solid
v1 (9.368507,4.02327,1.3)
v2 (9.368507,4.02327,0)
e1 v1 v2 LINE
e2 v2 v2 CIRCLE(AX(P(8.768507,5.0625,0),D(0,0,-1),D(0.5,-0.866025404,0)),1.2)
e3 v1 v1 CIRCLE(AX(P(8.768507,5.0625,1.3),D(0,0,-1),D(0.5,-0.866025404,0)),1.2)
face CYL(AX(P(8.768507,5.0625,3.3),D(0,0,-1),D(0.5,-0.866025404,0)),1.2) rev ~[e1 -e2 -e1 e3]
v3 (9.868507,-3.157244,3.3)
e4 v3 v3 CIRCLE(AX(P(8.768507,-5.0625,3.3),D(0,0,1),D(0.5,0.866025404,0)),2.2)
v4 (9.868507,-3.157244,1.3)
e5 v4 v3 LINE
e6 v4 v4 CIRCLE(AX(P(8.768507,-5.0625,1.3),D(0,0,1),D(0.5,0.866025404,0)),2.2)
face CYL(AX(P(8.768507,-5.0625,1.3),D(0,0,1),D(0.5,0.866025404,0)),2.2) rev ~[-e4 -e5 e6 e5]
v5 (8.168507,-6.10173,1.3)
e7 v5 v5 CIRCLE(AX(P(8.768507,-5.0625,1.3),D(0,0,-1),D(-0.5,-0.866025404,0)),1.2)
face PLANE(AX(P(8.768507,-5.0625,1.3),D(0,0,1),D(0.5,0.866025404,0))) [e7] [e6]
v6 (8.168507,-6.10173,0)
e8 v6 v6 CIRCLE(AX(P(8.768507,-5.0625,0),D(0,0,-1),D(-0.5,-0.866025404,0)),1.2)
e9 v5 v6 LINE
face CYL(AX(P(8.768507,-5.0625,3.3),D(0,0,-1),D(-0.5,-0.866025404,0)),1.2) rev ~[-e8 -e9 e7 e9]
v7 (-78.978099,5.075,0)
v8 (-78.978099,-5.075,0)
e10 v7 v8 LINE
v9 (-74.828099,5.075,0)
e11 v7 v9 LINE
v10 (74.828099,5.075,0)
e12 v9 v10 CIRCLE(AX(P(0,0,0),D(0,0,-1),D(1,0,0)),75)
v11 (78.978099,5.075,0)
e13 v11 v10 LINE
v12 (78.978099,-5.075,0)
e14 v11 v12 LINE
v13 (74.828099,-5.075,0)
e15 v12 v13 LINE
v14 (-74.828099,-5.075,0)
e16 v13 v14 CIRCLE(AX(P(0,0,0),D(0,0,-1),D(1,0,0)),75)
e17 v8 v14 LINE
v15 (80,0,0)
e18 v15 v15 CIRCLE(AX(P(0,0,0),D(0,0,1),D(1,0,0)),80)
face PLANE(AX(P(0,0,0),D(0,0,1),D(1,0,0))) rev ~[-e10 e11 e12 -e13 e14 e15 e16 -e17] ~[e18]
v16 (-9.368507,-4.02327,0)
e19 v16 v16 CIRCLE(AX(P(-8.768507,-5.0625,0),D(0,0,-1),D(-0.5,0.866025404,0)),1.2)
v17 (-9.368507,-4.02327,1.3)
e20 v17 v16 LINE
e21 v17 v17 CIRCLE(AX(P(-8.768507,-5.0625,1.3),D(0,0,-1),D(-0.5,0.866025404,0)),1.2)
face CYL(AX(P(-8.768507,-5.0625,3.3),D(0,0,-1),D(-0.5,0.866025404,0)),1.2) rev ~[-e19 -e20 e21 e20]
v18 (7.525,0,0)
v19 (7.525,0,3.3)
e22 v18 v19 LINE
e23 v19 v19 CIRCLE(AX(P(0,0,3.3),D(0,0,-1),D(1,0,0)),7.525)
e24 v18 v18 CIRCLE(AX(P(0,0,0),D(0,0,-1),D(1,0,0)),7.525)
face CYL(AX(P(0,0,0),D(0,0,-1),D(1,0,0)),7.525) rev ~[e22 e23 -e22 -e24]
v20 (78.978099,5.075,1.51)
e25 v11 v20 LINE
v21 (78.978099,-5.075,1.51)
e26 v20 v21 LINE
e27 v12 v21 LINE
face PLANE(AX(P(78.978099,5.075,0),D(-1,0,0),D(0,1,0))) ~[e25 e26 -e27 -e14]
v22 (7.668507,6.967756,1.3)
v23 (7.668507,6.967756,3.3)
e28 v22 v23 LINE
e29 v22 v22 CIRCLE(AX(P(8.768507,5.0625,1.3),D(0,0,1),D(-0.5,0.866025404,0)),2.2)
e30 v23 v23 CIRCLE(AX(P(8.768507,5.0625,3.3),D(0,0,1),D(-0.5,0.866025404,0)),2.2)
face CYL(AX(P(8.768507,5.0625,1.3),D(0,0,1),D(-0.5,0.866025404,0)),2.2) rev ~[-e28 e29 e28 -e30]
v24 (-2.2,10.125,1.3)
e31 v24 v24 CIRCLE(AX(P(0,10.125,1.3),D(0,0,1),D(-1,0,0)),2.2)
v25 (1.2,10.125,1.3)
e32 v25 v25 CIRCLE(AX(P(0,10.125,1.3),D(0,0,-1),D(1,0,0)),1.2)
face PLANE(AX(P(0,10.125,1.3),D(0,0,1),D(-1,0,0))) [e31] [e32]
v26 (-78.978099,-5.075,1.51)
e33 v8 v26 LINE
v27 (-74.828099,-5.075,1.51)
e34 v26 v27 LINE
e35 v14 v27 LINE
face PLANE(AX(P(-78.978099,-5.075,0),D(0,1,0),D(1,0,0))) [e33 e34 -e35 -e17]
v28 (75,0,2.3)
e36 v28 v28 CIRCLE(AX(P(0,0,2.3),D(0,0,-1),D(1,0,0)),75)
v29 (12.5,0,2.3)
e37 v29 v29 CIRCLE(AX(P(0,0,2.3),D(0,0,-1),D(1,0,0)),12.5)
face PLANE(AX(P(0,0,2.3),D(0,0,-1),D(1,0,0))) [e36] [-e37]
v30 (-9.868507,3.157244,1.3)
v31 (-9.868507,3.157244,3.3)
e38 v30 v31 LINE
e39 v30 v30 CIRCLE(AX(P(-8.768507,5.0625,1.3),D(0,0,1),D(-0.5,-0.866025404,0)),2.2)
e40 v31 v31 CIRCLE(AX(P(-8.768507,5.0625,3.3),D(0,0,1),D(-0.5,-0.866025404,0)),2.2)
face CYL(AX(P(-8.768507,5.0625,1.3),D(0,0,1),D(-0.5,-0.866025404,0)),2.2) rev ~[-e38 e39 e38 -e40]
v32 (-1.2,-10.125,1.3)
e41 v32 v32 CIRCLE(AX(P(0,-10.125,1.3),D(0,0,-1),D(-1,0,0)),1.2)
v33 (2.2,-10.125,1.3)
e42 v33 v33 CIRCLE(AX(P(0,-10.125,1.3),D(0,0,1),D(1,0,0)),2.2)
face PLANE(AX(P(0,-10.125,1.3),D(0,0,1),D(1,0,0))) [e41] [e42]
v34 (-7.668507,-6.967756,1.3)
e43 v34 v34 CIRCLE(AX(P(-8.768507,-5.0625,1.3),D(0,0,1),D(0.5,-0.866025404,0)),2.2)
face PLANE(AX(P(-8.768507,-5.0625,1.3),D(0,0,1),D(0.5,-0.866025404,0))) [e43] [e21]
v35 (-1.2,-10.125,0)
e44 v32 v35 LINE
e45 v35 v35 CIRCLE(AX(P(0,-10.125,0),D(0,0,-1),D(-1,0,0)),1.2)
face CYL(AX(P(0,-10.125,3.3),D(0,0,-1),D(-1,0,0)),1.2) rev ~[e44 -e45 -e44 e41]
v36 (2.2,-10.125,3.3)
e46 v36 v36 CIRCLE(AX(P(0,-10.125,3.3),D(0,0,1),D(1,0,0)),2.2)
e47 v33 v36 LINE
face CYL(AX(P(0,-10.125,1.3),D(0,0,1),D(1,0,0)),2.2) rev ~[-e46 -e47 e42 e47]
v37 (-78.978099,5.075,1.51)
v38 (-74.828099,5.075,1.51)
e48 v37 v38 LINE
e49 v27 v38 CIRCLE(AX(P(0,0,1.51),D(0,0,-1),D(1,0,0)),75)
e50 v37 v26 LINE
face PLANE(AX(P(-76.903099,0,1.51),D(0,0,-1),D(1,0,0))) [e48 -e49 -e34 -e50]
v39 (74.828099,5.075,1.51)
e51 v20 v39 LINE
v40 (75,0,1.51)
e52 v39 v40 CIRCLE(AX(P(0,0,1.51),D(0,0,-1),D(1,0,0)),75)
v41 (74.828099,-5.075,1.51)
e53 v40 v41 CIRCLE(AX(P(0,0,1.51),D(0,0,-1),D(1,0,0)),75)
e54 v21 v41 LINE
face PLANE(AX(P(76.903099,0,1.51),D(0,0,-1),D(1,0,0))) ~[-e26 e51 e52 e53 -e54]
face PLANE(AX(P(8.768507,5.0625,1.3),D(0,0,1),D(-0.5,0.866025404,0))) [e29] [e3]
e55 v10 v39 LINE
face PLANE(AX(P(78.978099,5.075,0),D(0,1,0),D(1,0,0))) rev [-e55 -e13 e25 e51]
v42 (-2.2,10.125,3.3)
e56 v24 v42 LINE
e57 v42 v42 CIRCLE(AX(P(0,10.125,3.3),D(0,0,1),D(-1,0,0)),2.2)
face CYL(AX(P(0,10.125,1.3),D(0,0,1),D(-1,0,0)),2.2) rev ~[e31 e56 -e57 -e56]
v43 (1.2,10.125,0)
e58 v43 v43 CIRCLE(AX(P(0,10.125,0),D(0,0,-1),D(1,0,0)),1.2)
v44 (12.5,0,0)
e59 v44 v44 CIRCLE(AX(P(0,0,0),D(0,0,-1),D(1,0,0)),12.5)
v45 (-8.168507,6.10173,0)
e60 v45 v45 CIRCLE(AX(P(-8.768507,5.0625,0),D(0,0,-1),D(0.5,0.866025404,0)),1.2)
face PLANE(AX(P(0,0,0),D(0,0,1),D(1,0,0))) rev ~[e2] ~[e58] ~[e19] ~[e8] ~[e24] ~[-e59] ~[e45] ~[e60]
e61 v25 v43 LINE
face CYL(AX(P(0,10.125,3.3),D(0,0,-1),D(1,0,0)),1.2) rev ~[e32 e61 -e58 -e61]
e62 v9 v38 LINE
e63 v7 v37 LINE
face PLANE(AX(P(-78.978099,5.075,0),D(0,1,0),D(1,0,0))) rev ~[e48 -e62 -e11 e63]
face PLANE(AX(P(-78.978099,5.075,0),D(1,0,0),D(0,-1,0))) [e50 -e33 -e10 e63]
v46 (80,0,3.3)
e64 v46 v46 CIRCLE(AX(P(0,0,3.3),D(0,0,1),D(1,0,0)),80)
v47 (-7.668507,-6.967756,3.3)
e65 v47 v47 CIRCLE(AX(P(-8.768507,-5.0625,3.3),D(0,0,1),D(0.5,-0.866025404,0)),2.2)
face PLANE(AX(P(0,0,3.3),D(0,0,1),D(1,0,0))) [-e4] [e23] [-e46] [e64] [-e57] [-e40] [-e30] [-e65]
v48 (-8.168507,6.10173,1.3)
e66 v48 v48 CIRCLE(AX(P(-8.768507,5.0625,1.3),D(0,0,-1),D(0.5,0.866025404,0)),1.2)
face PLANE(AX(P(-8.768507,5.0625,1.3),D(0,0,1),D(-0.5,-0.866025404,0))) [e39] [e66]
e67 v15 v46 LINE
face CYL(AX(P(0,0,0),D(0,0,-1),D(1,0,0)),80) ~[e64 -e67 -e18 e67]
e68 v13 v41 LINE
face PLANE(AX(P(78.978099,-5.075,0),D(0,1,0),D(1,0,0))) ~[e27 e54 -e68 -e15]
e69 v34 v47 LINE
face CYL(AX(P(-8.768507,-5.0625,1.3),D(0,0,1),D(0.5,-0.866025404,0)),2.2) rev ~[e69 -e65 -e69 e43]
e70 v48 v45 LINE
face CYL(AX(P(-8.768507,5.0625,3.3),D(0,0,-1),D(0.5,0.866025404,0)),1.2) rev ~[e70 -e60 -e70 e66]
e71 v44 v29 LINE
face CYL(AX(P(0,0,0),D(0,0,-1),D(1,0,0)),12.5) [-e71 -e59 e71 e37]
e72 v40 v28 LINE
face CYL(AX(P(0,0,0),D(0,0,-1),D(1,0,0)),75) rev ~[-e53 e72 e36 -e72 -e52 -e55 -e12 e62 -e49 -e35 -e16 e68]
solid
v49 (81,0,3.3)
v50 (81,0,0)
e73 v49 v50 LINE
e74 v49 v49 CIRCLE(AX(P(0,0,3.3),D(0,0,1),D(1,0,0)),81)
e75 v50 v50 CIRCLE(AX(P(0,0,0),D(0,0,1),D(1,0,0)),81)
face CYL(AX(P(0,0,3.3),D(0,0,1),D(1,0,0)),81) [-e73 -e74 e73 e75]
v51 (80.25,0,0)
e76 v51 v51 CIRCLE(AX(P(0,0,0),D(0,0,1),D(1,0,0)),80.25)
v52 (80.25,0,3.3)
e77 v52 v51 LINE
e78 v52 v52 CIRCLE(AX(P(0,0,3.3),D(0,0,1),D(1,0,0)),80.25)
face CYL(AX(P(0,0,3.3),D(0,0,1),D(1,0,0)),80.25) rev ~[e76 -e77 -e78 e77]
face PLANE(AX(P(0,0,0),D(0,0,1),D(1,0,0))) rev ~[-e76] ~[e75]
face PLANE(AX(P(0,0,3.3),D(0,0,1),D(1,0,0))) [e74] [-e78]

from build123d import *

# Parameters (mm, degrees)
F0_R            = 80
F1_DEPTH        = 3.3
F2_R            = 7.525
F3_DEPTH        = 3.301
F4_R            = 75
F4_R_2          = 12.5
F5_DEPTH        = 2.3
F7_D            = 2.4
F7_CBORE_D      = 4.4
F7_CBORE_DEPTH  = 2
F7_COPIES_COUNT = 6
F8_W            = 4.15
F8_H            = 10.15
F9_DEPTH        = 1.51
F10_R           = 81
F10_R_2         = 80.25
F11_DEPTH       = 3.3


# Not quite as in the source:
# - a pattern or mirror of a feature is missing from the dataset's text; its kind, count and spacing are read off the source's solid


with BuildPart() as f1:
    # F0 (on Top) → F1 (new body)
    with BuildSketch(Plane.XY):
        Circle(F0_R)
    extrude(amount=F1_DEPTH)

    # F2 (on face) → F3 (cut, through all)
    with BuildSketch(Plane(origin=(0, 0, 0), x_dir=(1, 0, 0), z_dir=(0, 0, -1))):
        Circle(F2_R)
    extrude(amount=-F3_DEPTH, mode=Mode.SUBTRACT)

    # F4 (on face) → F5 (cut)
    with BuildSketch(Plane(origin=(0, 0, 0), x_dir=(1, 0, 0), z_dir=(0, 0, -1))):
        Circle(F4_R)
        Circle(F4_R_2, mode=Mode.SUBTRACT)
    extrude(amount=-F5_DEPTH, mode=Mode.SUBTRACT)

    # F7 (through all)
    with Locations(Plane.XY.offset(3.3)):
        with Locations((0, -10.125)):
            f7 = CounterBoreHole(F7_D / 2, F7_CBORE_D / 2, F7_CBORE_DEPTH)

    # F7_copies: F7 ×6 about axis
    f7_copies_axis = Axis((0, 0, 0), (0, 0, 1))
    for i in range(1, F7_COPIES_COUNT):
        add(f7.rotate(f7_copies_axis, i * 360 / F7_COPIES_COUNT), mode=Mode.SUBTRACT)

    # F8 (on face) → F9 (cut)
    with BuildSketch(Plane(origin=(0, 0, 0), x_dir=(1, 0, 0), z_dir=(0, 0, -1))):
        with Locations((-76.9030988333, 0)):
            Rectangle(F8_W, F8_H)
    f9 = extrude(amount=-F9_DEPTH, mode=Mode.SUBTRACT)

    # F9_copies: F9 across plane
    add(f9.mirror(Plane(origin=(0, 0, 0), x_dir=(0, 0, 1), z_dir=(1, 0, 0))), mode=Mode.SUBTRACT)


with BuildPart() as f11:
    # F10 (on face) → F11 (new body)
    with BuildSketch(Plane.XY.offset(3.3)):
        Circle(F10_R)
        Circle(F10_R_2, mode=Mode.SUBTRACT)
    extrude(amount=-F11_DEPTH)


solid = Compound([f1.part, f11.part])
